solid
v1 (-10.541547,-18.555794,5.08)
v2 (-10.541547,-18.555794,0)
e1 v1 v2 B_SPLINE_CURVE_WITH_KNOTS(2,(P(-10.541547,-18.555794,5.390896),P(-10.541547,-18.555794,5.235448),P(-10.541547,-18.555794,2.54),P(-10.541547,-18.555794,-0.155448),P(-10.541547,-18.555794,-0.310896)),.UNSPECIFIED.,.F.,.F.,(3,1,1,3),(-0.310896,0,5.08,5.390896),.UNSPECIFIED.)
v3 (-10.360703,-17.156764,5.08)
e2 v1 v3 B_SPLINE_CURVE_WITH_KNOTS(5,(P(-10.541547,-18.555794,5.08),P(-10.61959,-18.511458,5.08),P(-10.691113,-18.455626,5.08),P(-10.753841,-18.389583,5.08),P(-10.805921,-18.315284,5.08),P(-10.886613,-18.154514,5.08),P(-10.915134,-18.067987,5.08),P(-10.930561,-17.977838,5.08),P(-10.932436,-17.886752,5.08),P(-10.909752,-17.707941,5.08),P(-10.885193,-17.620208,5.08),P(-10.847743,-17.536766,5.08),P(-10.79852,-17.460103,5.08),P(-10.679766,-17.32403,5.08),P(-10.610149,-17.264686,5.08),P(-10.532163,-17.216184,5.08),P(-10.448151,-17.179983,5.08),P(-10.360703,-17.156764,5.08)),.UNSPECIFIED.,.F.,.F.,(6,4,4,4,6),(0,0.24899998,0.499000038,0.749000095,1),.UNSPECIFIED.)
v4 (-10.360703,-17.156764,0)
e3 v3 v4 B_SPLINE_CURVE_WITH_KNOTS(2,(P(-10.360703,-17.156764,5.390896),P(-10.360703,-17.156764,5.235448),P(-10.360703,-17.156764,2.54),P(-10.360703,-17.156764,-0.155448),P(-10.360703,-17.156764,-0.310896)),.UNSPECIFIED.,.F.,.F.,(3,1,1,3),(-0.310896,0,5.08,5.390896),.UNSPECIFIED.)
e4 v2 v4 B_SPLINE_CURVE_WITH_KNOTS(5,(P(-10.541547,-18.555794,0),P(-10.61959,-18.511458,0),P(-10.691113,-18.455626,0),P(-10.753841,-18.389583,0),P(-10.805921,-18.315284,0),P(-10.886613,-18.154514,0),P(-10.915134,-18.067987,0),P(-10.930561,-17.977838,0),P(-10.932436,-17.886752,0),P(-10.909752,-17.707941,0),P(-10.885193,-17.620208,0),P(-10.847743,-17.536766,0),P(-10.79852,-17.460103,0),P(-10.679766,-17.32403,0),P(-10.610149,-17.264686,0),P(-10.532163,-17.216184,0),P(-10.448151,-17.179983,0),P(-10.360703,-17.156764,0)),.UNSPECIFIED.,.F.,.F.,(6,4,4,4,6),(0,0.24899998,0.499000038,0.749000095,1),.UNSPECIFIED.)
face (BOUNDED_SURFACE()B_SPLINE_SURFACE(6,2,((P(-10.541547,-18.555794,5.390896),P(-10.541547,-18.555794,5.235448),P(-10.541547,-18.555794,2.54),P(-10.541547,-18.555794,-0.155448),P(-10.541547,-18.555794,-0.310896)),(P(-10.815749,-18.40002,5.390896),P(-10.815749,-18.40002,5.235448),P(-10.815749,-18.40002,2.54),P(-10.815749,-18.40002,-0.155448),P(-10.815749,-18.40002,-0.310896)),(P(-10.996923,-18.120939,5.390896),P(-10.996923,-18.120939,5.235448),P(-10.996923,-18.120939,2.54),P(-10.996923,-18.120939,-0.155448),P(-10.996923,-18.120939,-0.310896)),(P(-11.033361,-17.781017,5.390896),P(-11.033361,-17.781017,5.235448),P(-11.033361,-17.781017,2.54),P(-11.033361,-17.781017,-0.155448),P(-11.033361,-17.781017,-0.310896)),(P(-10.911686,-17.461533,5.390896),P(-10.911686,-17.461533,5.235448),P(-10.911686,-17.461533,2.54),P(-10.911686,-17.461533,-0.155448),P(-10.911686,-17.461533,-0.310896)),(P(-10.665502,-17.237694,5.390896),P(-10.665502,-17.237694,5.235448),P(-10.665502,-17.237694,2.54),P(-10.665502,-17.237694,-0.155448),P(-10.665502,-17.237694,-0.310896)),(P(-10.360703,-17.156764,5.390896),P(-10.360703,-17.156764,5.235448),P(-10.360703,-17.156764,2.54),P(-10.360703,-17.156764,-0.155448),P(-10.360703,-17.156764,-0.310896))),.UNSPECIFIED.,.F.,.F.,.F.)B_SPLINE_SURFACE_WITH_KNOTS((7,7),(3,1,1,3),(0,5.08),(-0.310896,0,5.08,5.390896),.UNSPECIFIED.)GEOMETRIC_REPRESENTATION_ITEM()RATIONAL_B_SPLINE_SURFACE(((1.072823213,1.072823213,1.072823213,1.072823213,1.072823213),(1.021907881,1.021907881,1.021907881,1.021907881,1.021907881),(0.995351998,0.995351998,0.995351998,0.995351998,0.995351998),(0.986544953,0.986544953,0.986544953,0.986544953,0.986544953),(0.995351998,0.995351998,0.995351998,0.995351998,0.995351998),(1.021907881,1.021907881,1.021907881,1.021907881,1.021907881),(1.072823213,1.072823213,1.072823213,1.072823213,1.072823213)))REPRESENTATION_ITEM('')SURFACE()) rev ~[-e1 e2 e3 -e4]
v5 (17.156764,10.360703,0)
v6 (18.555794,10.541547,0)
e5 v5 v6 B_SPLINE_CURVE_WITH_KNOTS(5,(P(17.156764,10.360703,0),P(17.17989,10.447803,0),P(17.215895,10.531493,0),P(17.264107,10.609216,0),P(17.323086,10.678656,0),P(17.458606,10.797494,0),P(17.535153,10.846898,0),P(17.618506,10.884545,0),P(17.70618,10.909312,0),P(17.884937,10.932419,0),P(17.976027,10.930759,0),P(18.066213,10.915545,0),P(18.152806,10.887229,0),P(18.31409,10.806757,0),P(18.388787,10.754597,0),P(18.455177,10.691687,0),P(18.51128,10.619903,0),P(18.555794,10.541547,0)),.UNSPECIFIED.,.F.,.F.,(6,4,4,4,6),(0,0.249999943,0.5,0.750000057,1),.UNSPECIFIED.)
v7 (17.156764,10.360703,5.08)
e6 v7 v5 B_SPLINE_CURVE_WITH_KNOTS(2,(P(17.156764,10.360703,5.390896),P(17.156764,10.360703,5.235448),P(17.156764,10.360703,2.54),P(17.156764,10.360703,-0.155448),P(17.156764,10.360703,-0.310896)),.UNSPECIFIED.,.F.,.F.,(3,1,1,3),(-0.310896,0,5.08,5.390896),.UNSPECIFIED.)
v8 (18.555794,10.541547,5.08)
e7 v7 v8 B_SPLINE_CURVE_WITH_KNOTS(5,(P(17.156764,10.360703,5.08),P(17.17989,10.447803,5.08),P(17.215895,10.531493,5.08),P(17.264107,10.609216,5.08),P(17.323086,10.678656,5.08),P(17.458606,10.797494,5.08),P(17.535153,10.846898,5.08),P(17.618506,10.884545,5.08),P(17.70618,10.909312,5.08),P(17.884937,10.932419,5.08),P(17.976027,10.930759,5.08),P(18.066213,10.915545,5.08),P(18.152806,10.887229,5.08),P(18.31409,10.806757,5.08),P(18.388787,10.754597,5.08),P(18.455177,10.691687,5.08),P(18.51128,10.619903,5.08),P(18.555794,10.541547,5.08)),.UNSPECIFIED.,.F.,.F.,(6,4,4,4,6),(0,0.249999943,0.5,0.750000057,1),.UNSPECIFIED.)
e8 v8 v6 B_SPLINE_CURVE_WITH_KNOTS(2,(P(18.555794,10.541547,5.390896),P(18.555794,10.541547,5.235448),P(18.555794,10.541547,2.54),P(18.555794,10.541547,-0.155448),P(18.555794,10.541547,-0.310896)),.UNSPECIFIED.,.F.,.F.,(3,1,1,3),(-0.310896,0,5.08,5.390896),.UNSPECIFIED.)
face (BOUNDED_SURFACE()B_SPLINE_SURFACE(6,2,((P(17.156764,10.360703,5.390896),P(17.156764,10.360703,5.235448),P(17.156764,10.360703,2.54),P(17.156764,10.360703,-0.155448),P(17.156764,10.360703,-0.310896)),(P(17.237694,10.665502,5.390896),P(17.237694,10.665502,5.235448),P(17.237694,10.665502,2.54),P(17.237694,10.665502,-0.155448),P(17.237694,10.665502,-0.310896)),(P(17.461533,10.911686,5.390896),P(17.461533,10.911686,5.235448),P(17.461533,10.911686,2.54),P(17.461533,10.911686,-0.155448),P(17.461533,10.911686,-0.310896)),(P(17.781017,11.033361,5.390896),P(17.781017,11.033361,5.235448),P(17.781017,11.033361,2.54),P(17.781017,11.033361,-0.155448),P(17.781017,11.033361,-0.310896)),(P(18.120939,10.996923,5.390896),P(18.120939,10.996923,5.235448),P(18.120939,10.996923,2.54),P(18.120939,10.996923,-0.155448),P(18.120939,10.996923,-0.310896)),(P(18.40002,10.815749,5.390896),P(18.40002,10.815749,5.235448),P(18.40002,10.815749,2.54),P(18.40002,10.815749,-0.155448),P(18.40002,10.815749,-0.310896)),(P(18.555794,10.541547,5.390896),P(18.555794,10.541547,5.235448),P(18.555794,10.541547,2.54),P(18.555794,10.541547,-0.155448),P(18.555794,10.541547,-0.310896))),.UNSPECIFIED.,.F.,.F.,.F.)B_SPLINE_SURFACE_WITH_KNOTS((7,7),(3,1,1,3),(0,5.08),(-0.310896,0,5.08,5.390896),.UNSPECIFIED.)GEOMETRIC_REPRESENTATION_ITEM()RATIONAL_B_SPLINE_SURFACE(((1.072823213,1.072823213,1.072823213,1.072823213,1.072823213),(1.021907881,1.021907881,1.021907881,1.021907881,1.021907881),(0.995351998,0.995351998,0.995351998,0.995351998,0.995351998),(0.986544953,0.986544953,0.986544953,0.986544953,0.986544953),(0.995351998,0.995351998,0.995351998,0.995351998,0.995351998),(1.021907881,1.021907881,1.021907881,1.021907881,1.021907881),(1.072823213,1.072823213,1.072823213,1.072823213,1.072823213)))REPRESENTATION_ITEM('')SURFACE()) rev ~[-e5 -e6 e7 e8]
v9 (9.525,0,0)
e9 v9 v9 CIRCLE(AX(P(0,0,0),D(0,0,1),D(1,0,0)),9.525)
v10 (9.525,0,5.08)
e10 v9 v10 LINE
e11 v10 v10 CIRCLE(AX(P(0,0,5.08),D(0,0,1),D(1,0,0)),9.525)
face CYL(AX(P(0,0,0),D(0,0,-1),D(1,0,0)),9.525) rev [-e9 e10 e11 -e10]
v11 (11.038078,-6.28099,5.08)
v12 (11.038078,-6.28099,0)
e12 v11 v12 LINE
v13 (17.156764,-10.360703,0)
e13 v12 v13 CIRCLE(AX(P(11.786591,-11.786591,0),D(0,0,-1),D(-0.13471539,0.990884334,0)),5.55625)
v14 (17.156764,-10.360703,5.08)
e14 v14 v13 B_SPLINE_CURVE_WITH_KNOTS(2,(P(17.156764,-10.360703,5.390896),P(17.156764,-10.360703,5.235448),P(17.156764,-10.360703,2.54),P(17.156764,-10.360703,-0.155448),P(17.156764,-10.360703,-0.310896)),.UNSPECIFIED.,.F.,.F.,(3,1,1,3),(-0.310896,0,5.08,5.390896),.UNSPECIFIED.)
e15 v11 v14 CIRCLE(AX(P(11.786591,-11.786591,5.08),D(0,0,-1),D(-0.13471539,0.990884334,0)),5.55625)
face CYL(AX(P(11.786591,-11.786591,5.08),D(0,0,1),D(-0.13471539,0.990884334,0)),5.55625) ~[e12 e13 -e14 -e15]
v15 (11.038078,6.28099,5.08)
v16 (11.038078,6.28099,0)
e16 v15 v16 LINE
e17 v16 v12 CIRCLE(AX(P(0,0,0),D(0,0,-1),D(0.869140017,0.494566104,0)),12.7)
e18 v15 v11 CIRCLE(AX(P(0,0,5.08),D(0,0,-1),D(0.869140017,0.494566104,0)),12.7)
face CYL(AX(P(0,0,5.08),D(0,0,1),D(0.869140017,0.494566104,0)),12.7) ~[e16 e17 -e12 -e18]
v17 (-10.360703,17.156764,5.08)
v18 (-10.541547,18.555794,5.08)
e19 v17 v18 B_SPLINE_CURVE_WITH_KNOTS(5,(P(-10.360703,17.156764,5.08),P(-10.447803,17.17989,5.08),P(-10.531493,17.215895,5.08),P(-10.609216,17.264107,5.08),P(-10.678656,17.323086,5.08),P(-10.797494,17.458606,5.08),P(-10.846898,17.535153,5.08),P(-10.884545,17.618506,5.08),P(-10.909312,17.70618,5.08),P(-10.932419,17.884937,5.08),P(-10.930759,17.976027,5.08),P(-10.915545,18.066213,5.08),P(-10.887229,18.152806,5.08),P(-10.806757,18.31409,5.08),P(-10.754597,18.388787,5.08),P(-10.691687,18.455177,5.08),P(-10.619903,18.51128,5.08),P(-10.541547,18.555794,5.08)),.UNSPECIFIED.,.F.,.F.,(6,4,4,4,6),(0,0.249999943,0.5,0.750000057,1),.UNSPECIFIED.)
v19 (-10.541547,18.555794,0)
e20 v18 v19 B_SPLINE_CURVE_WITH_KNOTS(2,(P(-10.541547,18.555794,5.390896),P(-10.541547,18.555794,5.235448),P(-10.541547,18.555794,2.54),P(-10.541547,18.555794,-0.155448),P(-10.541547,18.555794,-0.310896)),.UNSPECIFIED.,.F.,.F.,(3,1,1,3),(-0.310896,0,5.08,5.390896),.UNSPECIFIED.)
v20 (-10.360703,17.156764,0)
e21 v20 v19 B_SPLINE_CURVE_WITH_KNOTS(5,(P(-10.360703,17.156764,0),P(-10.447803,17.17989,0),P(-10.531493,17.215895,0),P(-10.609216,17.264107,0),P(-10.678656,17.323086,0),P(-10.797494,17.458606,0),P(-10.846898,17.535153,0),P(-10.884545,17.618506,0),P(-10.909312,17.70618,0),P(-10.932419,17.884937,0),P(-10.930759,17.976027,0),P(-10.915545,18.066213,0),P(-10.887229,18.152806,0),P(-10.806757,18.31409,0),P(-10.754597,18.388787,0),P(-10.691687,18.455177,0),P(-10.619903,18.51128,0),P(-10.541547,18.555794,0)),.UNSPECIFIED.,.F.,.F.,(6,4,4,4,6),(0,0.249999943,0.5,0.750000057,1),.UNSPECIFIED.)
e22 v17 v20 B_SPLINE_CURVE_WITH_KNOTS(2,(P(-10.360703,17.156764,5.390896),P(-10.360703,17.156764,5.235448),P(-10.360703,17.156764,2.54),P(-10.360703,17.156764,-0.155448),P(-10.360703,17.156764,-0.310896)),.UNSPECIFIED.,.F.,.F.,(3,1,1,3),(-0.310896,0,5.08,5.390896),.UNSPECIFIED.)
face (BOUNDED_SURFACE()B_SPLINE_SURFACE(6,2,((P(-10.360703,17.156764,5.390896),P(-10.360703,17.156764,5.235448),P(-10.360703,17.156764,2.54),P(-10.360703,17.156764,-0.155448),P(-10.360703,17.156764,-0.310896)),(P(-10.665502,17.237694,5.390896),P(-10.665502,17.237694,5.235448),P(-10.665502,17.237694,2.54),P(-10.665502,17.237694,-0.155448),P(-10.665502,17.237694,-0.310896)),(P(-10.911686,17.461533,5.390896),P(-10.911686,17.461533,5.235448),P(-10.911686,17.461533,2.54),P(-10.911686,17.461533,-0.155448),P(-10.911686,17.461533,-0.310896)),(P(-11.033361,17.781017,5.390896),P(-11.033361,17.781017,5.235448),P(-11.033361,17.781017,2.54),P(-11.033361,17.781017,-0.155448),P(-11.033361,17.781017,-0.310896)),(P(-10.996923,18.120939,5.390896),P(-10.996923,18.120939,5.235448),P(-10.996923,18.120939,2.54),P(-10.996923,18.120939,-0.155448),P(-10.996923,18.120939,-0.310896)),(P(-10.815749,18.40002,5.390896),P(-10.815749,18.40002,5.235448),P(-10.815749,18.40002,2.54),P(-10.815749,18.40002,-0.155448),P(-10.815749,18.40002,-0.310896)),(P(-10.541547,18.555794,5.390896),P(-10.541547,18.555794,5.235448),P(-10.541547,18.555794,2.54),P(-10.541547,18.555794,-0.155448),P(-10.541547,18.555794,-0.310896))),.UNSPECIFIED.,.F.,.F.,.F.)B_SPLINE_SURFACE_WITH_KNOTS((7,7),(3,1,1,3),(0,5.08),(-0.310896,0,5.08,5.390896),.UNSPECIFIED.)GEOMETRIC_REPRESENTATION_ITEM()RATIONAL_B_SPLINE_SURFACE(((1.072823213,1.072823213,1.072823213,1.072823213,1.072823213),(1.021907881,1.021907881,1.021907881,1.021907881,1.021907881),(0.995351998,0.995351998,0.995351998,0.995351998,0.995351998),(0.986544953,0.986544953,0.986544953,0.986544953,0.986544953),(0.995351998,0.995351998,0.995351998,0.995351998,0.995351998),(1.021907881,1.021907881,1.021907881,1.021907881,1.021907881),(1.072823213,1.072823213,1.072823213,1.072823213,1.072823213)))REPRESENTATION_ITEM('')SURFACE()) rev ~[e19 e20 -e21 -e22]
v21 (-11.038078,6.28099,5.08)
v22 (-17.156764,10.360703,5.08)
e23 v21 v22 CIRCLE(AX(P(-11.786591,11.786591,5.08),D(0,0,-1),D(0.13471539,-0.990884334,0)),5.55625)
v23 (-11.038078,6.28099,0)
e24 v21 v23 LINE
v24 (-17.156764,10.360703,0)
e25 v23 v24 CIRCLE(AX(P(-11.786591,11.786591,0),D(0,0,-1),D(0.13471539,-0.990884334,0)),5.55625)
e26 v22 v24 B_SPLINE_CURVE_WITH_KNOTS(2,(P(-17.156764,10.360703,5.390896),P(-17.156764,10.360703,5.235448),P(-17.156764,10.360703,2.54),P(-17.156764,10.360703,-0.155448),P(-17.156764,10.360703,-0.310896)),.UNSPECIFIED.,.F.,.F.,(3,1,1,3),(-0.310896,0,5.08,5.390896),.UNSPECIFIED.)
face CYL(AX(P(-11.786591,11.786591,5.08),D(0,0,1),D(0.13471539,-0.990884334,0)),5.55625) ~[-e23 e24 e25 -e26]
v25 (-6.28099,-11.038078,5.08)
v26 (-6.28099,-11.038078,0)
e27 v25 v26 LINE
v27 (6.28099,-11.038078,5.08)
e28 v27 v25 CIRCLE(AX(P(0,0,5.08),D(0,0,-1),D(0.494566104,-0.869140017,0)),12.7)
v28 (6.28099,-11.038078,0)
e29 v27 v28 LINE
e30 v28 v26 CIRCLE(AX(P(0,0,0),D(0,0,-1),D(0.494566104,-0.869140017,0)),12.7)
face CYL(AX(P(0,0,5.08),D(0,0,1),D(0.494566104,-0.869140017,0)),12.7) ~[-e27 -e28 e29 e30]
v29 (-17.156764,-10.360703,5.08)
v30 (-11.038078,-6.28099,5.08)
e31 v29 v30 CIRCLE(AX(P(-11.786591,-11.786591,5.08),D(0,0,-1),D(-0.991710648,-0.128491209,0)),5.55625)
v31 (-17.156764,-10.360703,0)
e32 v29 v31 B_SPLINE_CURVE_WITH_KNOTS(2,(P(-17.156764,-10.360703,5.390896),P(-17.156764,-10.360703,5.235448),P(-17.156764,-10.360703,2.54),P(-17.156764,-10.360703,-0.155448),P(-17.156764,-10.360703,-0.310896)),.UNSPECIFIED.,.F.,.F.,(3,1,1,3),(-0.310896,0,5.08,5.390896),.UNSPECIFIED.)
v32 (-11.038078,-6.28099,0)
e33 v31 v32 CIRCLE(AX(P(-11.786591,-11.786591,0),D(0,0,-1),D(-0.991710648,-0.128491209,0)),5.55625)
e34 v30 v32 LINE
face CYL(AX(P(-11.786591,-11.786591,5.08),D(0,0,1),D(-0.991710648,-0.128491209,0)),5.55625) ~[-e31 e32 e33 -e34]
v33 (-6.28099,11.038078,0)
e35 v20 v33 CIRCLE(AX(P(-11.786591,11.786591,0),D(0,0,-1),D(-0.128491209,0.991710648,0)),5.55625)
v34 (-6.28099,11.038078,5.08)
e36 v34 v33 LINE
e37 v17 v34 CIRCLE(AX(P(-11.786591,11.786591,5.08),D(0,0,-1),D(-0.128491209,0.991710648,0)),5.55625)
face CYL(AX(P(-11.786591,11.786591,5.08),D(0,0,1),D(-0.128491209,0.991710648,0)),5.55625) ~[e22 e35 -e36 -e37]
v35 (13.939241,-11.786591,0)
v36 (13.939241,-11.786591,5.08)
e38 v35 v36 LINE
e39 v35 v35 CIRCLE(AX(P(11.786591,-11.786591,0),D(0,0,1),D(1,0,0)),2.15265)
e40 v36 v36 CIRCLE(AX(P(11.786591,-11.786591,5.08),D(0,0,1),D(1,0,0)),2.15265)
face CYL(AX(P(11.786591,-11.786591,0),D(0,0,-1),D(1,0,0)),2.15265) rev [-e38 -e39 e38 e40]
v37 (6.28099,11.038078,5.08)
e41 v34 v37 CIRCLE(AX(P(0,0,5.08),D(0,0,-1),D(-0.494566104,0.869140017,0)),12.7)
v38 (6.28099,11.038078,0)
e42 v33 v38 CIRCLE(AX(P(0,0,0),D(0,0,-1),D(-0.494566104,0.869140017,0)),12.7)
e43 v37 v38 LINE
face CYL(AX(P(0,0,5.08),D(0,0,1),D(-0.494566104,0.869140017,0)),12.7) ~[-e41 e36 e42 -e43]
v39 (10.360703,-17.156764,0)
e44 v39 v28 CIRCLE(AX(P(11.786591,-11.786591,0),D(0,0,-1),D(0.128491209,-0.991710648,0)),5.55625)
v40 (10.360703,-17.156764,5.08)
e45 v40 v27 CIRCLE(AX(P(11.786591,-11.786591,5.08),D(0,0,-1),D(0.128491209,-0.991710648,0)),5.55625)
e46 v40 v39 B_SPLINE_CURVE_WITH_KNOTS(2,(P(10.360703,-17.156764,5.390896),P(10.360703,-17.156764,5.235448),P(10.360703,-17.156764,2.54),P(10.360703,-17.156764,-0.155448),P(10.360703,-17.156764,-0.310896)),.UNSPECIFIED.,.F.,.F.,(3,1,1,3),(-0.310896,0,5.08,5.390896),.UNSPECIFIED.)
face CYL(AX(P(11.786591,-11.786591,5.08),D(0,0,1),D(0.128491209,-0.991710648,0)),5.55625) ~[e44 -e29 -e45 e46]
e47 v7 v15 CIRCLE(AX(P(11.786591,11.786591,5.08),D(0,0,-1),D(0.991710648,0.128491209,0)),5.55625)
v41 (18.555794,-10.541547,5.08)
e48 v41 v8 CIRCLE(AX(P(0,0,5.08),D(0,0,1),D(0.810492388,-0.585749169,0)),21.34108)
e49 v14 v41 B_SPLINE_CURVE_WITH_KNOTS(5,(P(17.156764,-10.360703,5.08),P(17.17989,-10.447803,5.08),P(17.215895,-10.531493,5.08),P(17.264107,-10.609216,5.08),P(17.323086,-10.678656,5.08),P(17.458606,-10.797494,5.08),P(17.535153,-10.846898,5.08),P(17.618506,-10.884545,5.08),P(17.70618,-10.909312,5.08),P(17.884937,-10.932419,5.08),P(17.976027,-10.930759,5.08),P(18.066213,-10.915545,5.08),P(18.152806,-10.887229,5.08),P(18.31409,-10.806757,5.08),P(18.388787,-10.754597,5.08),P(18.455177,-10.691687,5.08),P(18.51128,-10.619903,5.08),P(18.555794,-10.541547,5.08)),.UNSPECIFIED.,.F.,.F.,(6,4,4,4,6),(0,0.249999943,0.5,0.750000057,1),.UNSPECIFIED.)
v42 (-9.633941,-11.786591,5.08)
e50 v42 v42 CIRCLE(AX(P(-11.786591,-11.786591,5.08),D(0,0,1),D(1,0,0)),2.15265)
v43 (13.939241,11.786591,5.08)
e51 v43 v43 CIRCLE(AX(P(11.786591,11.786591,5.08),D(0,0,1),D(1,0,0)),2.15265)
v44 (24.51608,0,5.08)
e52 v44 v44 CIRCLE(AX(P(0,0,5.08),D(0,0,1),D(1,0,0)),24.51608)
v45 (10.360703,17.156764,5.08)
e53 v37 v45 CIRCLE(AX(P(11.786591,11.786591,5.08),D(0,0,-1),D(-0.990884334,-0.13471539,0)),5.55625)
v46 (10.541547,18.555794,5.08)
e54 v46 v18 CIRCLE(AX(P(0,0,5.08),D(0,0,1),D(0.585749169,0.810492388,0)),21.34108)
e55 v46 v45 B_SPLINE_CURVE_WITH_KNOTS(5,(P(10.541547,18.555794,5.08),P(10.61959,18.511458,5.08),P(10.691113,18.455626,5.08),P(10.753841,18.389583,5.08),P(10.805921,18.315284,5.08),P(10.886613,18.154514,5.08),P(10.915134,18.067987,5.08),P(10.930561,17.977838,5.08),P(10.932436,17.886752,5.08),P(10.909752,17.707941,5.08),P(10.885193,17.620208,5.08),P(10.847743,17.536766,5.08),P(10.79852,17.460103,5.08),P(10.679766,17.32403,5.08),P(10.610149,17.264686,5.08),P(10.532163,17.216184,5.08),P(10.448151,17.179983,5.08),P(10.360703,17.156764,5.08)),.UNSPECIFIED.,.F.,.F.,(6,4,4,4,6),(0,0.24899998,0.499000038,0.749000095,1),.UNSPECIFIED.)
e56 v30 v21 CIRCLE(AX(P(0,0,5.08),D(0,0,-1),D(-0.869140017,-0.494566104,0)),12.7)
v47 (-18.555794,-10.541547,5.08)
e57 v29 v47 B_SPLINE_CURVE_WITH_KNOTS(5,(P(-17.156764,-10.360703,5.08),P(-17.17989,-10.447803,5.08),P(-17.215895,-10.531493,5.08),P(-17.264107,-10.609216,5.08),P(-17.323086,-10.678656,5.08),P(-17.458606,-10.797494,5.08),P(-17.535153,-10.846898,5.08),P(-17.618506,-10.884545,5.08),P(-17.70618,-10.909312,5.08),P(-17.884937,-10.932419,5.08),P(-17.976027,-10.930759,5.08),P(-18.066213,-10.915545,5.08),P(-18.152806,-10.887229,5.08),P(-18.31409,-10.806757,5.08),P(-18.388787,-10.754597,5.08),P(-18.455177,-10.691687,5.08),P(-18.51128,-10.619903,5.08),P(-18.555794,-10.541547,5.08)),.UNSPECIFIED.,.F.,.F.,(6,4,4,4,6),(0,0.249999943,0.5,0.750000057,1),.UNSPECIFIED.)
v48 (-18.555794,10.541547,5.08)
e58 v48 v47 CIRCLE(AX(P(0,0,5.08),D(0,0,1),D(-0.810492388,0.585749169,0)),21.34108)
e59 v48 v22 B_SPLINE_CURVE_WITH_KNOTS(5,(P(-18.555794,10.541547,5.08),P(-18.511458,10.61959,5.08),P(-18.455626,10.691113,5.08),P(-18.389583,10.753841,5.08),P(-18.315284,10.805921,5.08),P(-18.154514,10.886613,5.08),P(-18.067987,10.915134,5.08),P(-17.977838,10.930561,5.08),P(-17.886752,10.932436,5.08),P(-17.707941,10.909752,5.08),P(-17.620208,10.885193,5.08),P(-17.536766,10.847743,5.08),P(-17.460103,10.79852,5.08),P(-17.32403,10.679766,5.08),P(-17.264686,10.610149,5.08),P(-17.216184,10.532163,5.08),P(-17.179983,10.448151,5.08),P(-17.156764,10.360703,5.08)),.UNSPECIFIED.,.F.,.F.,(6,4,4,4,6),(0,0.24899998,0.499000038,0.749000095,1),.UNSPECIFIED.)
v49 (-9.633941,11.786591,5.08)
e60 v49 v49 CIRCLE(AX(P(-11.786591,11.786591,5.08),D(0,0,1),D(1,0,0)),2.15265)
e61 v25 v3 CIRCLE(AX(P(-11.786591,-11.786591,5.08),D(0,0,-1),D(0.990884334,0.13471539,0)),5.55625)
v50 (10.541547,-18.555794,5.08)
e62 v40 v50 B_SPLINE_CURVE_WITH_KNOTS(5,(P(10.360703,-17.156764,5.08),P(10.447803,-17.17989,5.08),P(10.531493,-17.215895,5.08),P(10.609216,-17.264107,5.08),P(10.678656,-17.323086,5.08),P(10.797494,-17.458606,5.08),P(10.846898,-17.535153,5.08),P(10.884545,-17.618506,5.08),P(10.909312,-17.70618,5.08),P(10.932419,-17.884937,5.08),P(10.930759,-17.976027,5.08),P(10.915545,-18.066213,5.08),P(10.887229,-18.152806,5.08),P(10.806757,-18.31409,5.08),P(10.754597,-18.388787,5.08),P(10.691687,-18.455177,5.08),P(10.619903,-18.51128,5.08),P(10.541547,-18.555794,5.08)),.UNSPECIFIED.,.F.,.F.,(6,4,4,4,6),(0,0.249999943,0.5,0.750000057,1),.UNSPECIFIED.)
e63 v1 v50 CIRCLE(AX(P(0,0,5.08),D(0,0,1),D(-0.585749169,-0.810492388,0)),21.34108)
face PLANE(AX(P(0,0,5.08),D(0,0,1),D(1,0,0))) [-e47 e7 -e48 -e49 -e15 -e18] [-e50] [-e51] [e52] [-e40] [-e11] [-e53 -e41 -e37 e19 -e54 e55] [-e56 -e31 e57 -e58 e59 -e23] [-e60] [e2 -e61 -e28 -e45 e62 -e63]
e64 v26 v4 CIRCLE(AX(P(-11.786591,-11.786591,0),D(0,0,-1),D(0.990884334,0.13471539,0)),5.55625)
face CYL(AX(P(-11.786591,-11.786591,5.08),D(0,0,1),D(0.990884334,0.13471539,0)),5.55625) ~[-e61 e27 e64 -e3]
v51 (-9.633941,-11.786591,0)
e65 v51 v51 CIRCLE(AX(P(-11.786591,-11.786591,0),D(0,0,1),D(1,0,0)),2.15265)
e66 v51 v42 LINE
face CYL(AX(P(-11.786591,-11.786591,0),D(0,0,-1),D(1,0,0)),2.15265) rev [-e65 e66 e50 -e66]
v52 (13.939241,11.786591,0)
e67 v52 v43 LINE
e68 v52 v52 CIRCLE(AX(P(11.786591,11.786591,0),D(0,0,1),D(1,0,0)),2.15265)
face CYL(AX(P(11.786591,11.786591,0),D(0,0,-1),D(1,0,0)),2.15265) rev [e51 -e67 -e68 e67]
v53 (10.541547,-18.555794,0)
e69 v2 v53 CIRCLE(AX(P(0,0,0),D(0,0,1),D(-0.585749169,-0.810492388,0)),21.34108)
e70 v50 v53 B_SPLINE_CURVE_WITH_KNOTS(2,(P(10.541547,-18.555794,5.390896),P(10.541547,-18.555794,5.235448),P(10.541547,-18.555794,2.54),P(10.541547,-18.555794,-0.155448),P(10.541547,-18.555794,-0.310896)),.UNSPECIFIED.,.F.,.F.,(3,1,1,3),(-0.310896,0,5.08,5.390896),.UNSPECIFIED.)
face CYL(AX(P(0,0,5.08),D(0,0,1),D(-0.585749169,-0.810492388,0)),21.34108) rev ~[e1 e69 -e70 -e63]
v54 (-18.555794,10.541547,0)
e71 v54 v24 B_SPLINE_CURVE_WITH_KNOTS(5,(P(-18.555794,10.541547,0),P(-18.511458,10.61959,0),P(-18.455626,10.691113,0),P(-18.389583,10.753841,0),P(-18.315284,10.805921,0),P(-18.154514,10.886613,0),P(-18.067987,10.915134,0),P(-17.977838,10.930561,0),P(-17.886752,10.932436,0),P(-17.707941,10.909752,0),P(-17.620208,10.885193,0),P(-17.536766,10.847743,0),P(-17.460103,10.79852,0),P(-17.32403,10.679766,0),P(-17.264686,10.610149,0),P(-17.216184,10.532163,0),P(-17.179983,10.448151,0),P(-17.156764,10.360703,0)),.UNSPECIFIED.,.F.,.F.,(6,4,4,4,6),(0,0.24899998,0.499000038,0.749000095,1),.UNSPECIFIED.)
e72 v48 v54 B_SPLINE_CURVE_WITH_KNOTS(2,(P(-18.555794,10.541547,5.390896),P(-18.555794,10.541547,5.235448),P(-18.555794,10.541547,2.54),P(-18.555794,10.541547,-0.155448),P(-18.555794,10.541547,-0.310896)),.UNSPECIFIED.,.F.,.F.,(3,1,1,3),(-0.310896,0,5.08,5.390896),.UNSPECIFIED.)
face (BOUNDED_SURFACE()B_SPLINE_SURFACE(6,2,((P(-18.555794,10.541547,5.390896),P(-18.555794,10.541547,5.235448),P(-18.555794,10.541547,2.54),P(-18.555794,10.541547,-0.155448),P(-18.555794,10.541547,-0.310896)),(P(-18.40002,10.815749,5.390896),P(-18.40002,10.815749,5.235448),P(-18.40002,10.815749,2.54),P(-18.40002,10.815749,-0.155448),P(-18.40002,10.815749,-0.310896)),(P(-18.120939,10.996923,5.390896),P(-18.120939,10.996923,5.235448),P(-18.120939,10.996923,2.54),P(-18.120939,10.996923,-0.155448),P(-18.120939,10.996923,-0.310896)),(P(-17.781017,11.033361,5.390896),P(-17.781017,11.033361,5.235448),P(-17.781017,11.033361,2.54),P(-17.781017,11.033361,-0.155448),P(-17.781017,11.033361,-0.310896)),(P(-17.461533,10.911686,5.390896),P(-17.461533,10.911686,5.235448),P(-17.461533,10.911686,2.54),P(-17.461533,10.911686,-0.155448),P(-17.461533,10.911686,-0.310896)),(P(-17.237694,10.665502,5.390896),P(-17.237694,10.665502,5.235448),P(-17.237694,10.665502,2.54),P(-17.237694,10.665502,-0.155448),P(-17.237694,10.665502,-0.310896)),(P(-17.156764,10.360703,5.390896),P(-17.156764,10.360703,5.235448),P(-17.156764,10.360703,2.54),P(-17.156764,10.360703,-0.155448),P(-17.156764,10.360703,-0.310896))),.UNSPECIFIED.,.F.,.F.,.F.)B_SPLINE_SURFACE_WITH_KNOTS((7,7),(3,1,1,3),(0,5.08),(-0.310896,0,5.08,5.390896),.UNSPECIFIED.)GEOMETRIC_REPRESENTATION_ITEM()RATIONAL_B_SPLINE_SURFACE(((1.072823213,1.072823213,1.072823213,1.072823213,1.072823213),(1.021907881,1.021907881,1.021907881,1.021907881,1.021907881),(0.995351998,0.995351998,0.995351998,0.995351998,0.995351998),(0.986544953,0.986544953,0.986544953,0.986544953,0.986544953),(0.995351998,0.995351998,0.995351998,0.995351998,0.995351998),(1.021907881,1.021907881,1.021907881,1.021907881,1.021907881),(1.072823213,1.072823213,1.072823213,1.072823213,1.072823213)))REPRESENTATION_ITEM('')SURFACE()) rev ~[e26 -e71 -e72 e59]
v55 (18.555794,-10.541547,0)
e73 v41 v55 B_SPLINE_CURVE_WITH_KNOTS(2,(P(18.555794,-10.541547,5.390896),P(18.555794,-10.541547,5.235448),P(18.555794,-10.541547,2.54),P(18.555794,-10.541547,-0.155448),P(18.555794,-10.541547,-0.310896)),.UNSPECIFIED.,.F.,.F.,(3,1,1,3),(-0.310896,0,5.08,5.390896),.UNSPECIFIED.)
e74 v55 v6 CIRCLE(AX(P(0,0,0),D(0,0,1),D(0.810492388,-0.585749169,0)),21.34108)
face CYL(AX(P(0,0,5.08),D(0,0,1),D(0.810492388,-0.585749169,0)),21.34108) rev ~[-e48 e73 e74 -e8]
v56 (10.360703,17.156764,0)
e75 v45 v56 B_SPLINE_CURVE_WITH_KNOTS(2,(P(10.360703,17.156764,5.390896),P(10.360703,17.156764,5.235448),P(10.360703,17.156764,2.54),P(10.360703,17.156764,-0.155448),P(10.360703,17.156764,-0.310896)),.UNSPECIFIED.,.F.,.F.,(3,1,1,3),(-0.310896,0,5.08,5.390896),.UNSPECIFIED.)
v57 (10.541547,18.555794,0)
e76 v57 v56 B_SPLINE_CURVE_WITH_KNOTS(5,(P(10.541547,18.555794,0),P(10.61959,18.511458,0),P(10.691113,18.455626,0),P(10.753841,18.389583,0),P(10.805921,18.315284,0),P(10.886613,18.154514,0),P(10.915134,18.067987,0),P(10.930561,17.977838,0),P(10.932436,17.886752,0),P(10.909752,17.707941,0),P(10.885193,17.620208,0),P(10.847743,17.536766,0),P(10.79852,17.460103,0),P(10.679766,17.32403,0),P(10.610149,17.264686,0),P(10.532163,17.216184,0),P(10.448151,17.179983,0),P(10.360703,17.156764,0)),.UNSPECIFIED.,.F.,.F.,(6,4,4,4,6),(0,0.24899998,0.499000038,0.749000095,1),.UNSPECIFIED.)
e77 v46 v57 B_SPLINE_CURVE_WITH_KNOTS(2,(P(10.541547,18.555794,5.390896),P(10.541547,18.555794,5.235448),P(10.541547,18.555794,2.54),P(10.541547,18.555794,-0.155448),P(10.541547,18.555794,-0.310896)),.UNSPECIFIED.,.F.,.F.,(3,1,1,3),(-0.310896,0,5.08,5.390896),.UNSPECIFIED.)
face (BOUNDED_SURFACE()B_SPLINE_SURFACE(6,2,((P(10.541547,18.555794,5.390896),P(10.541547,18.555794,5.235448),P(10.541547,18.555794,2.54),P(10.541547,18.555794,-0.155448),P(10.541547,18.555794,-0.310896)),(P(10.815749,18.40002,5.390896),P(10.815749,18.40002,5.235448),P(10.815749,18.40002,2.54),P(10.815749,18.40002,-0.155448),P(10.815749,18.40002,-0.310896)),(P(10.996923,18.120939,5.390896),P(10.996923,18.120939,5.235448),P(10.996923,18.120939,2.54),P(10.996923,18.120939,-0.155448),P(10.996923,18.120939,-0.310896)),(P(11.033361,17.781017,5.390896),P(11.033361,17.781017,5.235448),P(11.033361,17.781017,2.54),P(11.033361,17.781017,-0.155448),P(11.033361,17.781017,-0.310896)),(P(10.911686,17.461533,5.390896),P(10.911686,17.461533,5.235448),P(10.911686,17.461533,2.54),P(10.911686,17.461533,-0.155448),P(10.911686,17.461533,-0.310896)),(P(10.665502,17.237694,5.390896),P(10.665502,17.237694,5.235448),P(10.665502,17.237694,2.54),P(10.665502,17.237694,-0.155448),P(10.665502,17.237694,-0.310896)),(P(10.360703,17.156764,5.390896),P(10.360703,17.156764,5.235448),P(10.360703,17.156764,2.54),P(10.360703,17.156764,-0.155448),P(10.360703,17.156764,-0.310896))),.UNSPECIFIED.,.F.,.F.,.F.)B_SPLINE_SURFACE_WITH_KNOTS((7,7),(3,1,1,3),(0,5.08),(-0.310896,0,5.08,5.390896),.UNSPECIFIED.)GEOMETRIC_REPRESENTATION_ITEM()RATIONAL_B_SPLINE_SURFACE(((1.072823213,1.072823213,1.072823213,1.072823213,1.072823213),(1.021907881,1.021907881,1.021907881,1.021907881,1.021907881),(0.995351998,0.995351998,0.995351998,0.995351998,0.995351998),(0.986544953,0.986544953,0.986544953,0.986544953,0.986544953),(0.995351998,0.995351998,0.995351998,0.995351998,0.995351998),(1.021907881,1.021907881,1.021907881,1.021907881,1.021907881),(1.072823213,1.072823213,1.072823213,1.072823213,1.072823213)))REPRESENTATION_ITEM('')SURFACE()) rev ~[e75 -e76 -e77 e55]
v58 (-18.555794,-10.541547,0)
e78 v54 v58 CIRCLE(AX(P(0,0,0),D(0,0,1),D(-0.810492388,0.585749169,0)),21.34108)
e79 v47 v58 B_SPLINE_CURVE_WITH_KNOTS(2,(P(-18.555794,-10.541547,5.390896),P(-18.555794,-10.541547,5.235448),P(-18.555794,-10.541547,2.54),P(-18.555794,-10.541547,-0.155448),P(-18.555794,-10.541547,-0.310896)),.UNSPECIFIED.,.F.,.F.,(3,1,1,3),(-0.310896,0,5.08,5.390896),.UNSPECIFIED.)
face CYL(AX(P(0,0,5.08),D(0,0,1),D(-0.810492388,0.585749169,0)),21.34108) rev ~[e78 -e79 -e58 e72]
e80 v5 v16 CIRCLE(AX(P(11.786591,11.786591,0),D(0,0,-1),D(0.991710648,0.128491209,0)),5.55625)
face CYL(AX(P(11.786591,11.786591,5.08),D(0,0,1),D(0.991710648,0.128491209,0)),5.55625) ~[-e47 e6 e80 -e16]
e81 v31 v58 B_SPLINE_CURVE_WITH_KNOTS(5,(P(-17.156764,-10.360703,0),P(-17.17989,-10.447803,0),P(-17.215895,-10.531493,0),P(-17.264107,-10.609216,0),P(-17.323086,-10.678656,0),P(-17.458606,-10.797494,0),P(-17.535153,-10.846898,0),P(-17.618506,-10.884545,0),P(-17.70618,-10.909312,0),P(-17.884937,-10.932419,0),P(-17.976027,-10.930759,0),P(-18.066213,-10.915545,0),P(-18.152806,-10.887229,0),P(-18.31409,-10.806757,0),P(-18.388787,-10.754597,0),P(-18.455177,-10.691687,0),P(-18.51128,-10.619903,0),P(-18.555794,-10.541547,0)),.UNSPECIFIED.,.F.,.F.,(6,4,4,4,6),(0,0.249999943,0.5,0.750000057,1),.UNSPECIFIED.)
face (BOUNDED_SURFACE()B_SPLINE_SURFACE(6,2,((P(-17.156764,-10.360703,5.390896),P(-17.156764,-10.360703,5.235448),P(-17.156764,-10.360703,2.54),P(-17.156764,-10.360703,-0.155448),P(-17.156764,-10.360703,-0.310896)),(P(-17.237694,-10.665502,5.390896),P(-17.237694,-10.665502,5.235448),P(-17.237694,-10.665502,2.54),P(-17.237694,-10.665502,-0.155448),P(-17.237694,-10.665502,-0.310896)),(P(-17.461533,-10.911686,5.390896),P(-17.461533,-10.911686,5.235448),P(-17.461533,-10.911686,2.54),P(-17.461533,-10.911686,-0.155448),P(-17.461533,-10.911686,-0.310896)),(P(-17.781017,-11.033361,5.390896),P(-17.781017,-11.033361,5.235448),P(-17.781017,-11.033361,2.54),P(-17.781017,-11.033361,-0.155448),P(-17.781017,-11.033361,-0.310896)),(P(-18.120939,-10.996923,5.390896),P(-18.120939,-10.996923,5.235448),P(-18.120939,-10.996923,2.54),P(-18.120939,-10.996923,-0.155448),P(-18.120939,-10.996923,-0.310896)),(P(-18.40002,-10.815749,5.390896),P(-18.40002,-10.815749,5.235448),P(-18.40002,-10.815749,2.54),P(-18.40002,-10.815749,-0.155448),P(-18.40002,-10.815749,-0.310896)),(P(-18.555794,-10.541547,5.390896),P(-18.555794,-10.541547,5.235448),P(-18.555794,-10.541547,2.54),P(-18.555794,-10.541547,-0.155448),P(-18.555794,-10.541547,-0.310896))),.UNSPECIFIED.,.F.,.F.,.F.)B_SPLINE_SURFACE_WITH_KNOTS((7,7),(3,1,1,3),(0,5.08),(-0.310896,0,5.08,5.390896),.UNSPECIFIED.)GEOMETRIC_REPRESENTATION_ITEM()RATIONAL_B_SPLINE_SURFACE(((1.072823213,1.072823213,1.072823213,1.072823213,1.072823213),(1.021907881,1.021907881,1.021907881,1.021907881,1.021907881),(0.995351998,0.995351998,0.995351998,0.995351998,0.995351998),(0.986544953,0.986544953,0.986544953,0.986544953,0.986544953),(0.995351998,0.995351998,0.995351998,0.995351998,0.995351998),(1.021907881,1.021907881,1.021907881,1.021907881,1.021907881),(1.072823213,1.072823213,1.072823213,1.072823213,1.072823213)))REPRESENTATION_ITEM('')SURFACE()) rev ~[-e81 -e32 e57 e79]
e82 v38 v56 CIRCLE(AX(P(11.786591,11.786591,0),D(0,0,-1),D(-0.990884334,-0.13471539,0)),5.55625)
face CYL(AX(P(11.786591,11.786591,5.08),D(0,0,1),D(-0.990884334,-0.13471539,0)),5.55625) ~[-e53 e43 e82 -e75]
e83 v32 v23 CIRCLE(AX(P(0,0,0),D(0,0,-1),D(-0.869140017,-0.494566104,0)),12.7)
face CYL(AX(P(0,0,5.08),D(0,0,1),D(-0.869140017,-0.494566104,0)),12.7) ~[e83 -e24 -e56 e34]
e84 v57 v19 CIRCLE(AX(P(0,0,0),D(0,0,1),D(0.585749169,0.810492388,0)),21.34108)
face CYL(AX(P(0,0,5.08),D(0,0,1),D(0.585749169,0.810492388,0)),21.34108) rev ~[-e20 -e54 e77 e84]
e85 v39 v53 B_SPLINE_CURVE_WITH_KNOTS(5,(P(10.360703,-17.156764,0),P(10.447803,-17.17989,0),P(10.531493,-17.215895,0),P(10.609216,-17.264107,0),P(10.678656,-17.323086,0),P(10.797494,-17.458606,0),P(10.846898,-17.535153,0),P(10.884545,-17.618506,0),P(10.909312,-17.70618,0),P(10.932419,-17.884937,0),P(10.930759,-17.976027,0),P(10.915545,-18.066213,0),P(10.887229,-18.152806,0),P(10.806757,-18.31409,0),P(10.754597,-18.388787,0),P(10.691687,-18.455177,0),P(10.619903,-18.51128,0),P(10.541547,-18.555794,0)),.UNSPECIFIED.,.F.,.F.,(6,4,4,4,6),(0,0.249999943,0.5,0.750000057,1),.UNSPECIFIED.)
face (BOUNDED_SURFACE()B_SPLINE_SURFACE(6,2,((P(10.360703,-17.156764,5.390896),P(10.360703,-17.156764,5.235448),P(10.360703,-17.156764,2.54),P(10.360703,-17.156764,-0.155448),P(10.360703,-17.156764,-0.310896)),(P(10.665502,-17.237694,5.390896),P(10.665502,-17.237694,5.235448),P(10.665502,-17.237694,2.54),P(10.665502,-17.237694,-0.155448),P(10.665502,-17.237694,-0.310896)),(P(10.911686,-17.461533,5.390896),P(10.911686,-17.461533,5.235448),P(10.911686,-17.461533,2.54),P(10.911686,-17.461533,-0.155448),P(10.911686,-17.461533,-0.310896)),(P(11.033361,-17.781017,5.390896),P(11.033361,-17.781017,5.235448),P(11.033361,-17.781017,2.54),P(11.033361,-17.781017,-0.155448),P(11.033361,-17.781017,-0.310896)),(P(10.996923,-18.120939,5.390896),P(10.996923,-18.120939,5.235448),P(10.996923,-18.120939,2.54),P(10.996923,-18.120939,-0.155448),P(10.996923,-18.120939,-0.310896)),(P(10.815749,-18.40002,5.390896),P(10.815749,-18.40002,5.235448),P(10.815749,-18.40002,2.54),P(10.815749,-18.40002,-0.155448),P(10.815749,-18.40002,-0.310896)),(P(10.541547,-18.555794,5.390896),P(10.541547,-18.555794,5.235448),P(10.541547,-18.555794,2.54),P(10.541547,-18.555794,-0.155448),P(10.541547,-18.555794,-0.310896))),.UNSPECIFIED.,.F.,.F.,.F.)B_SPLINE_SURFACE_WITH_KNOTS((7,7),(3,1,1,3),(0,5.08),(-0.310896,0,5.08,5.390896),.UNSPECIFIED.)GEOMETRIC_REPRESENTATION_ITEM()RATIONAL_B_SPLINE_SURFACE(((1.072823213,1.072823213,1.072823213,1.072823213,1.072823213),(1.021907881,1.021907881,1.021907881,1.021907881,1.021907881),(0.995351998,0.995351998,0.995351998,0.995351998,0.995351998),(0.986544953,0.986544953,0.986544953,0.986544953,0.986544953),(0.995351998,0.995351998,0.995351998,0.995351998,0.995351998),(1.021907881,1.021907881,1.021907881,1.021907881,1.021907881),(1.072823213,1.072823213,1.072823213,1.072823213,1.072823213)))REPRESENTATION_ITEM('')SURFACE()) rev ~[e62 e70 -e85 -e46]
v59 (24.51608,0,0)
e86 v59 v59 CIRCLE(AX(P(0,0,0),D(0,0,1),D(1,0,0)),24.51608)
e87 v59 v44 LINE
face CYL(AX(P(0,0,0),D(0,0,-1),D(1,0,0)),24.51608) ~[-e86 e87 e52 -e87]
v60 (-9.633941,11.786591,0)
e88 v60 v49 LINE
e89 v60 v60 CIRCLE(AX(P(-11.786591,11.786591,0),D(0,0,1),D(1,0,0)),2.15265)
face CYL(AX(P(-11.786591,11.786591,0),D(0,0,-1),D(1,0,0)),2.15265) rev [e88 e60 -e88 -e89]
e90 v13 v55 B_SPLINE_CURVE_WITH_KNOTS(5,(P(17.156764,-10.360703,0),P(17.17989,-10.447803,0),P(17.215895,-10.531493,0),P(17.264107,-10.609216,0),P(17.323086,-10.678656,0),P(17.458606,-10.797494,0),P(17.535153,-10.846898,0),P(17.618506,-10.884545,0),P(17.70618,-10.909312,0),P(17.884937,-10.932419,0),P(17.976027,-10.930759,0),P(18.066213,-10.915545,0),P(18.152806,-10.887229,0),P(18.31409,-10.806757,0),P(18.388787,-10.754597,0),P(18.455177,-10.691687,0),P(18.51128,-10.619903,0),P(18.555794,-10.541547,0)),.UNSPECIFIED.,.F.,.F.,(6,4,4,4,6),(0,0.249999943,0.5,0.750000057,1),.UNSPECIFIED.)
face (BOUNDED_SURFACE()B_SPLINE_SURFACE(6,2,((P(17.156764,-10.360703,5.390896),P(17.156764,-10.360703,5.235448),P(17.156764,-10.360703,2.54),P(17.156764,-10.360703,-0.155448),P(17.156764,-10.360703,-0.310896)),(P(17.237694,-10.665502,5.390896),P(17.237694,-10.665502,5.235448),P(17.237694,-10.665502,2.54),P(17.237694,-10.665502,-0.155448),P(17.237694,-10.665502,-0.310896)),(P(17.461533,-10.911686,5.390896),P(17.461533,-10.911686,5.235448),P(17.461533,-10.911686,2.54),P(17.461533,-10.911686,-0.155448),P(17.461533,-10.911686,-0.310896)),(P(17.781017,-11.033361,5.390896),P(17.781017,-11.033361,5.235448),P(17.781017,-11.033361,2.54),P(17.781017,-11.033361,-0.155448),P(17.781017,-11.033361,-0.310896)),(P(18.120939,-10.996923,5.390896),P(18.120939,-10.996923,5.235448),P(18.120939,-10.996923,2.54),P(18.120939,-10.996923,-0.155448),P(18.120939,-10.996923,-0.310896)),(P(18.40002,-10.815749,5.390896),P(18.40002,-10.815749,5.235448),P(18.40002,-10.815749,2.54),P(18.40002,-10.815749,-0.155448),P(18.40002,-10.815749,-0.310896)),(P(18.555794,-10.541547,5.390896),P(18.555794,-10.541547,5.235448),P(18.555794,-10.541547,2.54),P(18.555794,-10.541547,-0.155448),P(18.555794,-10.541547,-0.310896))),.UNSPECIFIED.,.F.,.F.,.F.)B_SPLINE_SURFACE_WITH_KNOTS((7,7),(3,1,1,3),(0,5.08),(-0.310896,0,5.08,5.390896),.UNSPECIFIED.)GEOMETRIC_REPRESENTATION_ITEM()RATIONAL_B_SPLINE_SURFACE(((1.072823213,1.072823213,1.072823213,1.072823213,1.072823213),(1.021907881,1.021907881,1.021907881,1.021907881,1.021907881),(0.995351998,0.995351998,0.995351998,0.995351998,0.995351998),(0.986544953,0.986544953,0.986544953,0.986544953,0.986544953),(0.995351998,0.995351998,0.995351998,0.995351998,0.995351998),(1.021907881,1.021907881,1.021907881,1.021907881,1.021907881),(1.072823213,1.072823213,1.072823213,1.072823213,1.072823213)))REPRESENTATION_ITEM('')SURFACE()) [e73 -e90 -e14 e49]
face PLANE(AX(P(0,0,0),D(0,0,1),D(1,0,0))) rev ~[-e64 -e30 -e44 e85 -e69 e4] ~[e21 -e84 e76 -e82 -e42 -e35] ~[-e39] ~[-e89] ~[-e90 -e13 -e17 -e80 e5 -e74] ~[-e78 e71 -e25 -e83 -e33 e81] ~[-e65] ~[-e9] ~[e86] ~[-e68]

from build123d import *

# Parameters (mm, degrees)
F0_R            = 24.51608
F0_R_2          = 2.15265
F0_R_3          = 9.525
F1_DEPTH        = 5.08
F3_DEPTH        = 5.08
F3_COPIES_COUNT = 4
F4_R            = 0.762


# Not quite as in the source:
# - a pattern or mirror of a feature is missing from the dataset's text; its kind, count and spacing are read off the source's solid


with BuildPart() as f1:
    # F0 (on Top) → F1 (new body)
    with BuildSketch(Plane.XY):
        Circle(F0_R)
        with Locations((-11.7865906, -11.7865906)):
            Circle(F0_R_2, mode=Mode.SUBTRACT)
        with Locations((11.7865906, -11.7865906)):
            Circle(F0_R_2, mode=Mode.SUBTRACT)
        with Locations((-11.7865906, 11.7865906)):
            Circle(F0_R_2, mode=Mode.SUBTRACT)
        Circle(F0_R_3, mode=Mode.SUBTRACT)
        with Locations((11.7865906, 11.7865906)):
            Circle(F0_R_2, mode=Mode.SUBTRACT)
    extrude(amount=F1_DEPTH)

    # F2 (on face) → F3 (cut, through all)
    with BuildSketch(Plane.XY.offset(5.08)):
        with BuildLine():
            ThreePointArc((-12.5005198818, 17.2967828873), (-7.8454136559, 15.7030990397), (-6.2809895182, 11.0380782146))
            ThreePointArc((-6.2809895182, 11.0380782146), (0, 12.7), (6.2809895182, 11.0380782146))
            ThreePointArc((6.2809895182, 11.0380782146), (7.8454136559, 15.7030990397), (12.5005198818, 17.2967828873))
            ThreePointArc((12.5005198818, 17.2967828873), (0, 21.34108), (-12.5005198818, 17.2967828873))
        make_face()
    f3 = extrude(amount=-F3_DEPTH, mode=Mode.SUBTRACT)

    # F3_copies: F3 ×4 about axis
    f3_copies_axis = Axis((0, 0, 0), (0, 0, 1))
    for i in range(1, F3_COPIES_COUNT):
        add(f3.rotate(f3_copies_axis, i * 360 / F3_COPIES_COUNT), mode=Mode.SUBTRACT)

    # F4
    f4_edges = [f1.edges().sort_by_distance(p)[0] for p in [
        (-12.50052, 17.296783, 2.54),
        (12.50052, 17.296783, 2.54),
        (-17.296783, 12.50052, 2.54),
        (-17.296783, -12.50052, 2.54),
        (-12.50052, -17.296783, 2.54),
        (12.50052, -17.296783, 2.54),
        (17.296783, -12.50052, 2.54),
        (17.296783, 12.50052, 2.54),
    ]]
    fillet(f4_edges, radius=F4_R)


solid = f1.part
